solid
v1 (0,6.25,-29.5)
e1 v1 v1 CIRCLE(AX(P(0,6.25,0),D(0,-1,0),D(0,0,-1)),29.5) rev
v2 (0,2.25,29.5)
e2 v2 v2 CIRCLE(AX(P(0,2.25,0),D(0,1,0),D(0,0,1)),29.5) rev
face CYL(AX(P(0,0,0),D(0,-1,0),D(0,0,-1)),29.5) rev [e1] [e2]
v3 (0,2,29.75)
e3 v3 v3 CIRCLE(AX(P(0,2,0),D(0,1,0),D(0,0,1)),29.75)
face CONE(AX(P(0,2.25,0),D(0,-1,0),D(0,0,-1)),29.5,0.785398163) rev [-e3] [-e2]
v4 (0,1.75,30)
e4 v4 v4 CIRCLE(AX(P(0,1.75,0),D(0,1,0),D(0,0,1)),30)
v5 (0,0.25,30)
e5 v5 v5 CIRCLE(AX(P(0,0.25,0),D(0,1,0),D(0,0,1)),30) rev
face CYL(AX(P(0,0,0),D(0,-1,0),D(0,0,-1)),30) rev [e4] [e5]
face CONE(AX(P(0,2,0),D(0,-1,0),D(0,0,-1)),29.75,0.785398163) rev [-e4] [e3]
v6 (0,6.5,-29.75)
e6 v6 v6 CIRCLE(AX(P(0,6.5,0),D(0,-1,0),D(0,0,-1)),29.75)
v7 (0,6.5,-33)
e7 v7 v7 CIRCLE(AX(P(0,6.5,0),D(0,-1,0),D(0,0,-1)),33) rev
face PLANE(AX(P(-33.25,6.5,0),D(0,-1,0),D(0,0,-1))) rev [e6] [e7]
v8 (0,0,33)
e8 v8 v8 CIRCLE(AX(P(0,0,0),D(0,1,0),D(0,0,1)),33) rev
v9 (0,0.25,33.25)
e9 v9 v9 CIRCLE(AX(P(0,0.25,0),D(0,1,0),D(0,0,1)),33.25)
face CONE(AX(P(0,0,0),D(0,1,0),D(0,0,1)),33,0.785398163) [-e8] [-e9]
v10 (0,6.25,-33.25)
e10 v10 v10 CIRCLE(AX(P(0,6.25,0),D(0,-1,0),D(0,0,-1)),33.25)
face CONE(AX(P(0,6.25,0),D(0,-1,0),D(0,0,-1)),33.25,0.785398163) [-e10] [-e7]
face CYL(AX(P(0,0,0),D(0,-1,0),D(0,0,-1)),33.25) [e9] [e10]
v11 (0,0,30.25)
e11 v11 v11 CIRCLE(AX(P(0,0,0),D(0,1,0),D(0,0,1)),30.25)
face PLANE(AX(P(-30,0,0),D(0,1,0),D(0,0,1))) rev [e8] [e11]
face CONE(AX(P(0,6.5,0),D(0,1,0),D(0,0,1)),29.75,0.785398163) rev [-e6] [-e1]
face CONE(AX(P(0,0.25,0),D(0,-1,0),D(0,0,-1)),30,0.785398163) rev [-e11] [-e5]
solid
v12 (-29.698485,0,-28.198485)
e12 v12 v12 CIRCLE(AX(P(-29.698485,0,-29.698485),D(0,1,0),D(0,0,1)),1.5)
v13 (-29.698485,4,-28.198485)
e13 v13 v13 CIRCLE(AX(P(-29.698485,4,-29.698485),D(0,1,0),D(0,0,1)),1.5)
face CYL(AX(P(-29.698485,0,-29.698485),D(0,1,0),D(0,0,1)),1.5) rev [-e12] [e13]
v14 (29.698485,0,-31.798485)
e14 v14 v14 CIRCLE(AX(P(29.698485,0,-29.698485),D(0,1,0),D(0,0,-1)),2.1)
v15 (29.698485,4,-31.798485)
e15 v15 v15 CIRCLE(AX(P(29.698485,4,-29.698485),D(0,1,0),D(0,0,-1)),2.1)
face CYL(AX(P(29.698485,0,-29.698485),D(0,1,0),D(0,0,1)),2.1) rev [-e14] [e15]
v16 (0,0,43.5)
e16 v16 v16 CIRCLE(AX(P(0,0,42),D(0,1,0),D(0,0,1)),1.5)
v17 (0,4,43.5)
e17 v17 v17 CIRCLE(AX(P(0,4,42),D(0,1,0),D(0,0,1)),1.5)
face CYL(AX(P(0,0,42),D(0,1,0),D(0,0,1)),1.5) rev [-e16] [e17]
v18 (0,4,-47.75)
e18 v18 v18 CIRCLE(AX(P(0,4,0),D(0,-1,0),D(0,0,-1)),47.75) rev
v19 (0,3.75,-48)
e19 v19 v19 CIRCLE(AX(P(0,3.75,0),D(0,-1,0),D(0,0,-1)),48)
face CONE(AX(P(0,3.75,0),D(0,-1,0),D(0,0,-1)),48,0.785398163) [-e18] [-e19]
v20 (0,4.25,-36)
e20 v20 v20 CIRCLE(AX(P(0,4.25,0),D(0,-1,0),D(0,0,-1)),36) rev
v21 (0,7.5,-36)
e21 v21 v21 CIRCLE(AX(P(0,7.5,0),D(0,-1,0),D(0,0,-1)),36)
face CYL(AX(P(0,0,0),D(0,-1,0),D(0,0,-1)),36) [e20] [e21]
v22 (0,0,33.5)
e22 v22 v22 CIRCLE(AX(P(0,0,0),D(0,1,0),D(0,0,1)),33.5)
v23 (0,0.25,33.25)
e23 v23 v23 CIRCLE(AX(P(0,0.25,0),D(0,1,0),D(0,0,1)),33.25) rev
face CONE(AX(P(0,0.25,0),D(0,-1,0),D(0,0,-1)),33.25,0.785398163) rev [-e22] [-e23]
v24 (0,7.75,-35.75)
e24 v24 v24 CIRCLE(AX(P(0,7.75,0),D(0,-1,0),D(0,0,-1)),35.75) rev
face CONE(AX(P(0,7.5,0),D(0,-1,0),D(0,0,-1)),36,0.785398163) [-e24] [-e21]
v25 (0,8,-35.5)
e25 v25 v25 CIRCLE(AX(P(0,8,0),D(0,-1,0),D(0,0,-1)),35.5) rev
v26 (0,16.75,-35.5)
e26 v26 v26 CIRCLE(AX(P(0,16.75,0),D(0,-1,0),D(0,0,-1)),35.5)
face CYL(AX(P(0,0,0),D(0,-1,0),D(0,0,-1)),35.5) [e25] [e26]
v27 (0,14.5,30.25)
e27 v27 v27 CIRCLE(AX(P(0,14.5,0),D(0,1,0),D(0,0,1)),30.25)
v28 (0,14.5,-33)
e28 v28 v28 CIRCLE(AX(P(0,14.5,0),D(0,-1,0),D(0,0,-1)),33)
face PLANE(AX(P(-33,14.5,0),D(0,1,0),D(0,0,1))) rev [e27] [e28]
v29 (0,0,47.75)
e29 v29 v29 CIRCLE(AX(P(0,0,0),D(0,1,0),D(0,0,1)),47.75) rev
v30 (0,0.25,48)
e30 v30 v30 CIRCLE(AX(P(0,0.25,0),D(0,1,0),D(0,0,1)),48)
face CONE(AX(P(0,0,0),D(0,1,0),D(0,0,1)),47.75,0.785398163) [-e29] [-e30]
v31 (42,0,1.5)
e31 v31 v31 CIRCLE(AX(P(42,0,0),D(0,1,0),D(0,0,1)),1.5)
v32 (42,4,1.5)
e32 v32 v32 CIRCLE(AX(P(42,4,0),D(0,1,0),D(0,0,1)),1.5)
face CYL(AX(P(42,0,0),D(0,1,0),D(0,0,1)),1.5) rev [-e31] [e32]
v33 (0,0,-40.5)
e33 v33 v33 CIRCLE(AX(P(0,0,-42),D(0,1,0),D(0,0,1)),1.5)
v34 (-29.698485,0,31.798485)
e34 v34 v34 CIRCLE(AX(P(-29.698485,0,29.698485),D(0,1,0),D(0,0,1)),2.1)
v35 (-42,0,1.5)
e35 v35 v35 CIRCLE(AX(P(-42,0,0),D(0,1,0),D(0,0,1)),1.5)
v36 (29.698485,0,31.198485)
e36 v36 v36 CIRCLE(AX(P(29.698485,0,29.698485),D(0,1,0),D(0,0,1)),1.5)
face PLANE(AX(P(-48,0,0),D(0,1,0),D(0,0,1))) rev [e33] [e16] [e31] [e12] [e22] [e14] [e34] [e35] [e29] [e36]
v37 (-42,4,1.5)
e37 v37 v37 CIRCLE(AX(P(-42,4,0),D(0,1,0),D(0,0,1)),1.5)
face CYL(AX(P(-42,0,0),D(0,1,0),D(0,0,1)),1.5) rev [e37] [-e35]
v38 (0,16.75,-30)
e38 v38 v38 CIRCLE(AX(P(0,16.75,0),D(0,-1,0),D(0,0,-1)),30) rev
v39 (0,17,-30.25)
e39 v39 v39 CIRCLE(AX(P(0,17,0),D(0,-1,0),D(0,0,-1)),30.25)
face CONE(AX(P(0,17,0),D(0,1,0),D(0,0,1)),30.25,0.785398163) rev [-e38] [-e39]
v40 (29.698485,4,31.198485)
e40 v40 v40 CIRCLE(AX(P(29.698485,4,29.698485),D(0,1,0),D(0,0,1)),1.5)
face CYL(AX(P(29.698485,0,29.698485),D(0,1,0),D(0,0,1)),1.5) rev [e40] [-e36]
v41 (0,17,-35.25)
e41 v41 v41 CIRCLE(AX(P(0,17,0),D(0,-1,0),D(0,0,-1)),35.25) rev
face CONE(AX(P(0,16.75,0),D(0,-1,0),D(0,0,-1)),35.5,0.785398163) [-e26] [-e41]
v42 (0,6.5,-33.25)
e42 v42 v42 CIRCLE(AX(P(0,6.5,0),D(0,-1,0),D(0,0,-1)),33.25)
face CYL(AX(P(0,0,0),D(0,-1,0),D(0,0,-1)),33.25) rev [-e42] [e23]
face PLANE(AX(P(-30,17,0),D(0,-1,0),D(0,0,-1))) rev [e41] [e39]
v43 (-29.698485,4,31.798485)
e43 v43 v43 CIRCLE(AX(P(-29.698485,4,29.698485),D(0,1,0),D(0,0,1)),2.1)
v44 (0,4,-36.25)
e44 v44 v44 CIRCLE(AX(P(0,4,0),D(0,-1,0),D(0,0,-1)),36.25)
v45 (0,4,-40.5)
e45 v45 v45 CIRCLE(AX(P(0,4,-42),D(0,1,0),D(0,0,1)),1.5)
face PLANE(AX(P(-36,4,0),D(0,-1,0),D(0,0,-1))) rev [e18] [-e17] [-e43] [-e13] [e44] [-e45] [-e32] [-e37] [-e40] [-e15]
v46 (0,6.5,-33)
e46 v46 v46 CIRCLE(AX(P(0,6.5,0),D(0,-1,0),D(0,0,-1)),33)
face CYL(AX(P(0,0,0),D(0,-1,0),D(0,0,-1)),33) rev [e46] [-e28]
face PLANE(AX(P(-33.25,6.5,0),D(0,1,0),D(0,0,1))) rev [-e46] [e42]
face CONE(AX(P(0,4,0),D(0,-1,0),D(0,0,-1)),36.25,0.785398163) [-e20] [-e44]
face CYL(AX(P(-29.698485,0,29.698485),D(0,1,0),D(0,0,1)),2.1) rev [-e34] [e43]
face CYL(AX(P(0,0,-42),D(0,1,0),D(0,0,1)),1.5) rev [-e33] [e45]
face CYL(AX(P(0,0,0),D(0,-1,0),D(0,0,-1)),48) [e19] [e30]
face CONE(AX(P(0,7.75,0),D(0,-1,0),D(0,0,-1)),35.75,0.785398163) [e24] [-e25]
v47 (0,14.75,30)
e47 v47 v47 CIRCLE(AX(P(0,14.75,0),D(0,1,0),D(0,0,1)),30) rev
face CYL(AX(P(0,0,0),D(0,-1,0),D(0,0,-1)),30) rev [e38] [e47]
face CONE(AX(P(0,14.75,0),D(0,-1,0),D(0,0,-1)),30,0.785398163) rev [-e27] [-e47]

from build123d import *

# Parameters (mm, degrees)
SKETCH_2_R          = 1.5
SKETCH_2_R_2        = 2.1
CUT_EXTRUDE_1_DEPTH = 70.115844783
CHAMFER_1_SIZE      = 0.25
CHAMFER_2_SIZE      = 0.25


with BuildPart() as part:
    # 草图1 → 旋转1 (revolve)
    with BuildSketch(Plane.XY, mode=Mode.PRIVATE) as revolve_1_sk:
        Polygon((-48, 0), (-33.25, 0), (-33.25, 6.5), (-33, 6.5), (-33, 14.5), (-30, 14.5), (-30, 17), (-35.5, 17), (-35.5, 7.75), (-36, 7.75), (-36, 4), (-48, 4), align=None)
    revolve(revolve_1_sk.sketch.rotate(Axis((0, 0, 0), (0, 1, 0)), 270), axis=Axis((0, 0, 0), (0, 1, 0)))

    # 草图2 → 切除-拉伸1 (cut, through all)
    with BuildSketch(Plane(origin=(0, 4, 0), x_dir=(1, 0, 0), z_dir=(0, 1, 0))):
        with Locations(Location((-42, 0, 0), (0, 0, 270))):
            Circle(SKETCH_2_R)
        with Locations(Location((-29.69848481, 29.69848481, 0), (0, 0, 270))):
            Circle(SKETCH_2_R)
        with Locations(Location((0, 42, 0), (0, 0, 270))):
            Circle(SKETCH_2_R)
        with Locations(Location((42, 0, 0), (0, 0, 270))):
            Circle(SKETCH_2_R)
        with Locations(Location((29.69848481, -29.69848481, 0), (0, 0, 270))):
            Circle(SKETCH_2_R)
        with Locations(Location((0, -42, 0), (0, 0, 270))):
            Circle(SKETCH_2_R)
        with Locations(Location((-29.69848481, -29.69848481, 0), (0, 0, 270))):
            Circle(SKETCH_2_R_2)
        with Locations(Location((29.69848481, 29.69848481, 0), (0, 0, 90))):
            Circle(SKETCH_2_R_2)
    extrude(amount=-CUT_EXTRUDE_1_DEPTH, mode=Mode.SUBTRACT)

    # 倒角1
    chamfer_1_edges = [part.edges().sort_by_distance(p)[0] for p in [
        (0, 7.75, 36),
        (0, 7.75, 35.5),
        (0, 17, 35.5),
        (0, 17, 30),
        (0, 14.5, 30),
        (0, 0, 33.25),
        (0, 0, 48),
        (0, 4, 48),
        (0, 4, 36),
    ]]
    chamfer(chamfer_1_edges, length=CHAMFER_1_SIZE - 0.0001)  # a hair under: the kernel refuses the full size


with BuildPart() as body_2:
    # 草图3 → 旋转2 (revolve)
    with BuildSketch(Plane.XY, mode=Mode.PRIVATE) as revolve_2_sk:
        Polygon((-33.25, 0), (-33.25, 6.5), (-29.5, 6.5), (-29.5, 2), (-30, 2), (-30, 0), align=None)
    revolve(revolve_2_sk.sketch.rotate(Axis((0, 0, 0), (0, 1, 0)), 270), axis=Axis((0, 0, 0), (0, 1, 0)))

    # 倒角2
    chamfer_2_edges = [body_2.edges().sort_by_distance(p)[0] for p in [
        (0, 6.5, 33.25),
        (0, 0, 33.25),
        (0, 0, 30),
        (0, 2, 30),
        (0, 2, 29.5),
        (0, 6.5, 29.5),
    ]]
    chamfer(chamfer_2_edges, length=CHAMFER_2_SIZE - 0.0001)  # a hair under: the kernel refuses the full size


solid = Compound([part.part, body_2.part])
